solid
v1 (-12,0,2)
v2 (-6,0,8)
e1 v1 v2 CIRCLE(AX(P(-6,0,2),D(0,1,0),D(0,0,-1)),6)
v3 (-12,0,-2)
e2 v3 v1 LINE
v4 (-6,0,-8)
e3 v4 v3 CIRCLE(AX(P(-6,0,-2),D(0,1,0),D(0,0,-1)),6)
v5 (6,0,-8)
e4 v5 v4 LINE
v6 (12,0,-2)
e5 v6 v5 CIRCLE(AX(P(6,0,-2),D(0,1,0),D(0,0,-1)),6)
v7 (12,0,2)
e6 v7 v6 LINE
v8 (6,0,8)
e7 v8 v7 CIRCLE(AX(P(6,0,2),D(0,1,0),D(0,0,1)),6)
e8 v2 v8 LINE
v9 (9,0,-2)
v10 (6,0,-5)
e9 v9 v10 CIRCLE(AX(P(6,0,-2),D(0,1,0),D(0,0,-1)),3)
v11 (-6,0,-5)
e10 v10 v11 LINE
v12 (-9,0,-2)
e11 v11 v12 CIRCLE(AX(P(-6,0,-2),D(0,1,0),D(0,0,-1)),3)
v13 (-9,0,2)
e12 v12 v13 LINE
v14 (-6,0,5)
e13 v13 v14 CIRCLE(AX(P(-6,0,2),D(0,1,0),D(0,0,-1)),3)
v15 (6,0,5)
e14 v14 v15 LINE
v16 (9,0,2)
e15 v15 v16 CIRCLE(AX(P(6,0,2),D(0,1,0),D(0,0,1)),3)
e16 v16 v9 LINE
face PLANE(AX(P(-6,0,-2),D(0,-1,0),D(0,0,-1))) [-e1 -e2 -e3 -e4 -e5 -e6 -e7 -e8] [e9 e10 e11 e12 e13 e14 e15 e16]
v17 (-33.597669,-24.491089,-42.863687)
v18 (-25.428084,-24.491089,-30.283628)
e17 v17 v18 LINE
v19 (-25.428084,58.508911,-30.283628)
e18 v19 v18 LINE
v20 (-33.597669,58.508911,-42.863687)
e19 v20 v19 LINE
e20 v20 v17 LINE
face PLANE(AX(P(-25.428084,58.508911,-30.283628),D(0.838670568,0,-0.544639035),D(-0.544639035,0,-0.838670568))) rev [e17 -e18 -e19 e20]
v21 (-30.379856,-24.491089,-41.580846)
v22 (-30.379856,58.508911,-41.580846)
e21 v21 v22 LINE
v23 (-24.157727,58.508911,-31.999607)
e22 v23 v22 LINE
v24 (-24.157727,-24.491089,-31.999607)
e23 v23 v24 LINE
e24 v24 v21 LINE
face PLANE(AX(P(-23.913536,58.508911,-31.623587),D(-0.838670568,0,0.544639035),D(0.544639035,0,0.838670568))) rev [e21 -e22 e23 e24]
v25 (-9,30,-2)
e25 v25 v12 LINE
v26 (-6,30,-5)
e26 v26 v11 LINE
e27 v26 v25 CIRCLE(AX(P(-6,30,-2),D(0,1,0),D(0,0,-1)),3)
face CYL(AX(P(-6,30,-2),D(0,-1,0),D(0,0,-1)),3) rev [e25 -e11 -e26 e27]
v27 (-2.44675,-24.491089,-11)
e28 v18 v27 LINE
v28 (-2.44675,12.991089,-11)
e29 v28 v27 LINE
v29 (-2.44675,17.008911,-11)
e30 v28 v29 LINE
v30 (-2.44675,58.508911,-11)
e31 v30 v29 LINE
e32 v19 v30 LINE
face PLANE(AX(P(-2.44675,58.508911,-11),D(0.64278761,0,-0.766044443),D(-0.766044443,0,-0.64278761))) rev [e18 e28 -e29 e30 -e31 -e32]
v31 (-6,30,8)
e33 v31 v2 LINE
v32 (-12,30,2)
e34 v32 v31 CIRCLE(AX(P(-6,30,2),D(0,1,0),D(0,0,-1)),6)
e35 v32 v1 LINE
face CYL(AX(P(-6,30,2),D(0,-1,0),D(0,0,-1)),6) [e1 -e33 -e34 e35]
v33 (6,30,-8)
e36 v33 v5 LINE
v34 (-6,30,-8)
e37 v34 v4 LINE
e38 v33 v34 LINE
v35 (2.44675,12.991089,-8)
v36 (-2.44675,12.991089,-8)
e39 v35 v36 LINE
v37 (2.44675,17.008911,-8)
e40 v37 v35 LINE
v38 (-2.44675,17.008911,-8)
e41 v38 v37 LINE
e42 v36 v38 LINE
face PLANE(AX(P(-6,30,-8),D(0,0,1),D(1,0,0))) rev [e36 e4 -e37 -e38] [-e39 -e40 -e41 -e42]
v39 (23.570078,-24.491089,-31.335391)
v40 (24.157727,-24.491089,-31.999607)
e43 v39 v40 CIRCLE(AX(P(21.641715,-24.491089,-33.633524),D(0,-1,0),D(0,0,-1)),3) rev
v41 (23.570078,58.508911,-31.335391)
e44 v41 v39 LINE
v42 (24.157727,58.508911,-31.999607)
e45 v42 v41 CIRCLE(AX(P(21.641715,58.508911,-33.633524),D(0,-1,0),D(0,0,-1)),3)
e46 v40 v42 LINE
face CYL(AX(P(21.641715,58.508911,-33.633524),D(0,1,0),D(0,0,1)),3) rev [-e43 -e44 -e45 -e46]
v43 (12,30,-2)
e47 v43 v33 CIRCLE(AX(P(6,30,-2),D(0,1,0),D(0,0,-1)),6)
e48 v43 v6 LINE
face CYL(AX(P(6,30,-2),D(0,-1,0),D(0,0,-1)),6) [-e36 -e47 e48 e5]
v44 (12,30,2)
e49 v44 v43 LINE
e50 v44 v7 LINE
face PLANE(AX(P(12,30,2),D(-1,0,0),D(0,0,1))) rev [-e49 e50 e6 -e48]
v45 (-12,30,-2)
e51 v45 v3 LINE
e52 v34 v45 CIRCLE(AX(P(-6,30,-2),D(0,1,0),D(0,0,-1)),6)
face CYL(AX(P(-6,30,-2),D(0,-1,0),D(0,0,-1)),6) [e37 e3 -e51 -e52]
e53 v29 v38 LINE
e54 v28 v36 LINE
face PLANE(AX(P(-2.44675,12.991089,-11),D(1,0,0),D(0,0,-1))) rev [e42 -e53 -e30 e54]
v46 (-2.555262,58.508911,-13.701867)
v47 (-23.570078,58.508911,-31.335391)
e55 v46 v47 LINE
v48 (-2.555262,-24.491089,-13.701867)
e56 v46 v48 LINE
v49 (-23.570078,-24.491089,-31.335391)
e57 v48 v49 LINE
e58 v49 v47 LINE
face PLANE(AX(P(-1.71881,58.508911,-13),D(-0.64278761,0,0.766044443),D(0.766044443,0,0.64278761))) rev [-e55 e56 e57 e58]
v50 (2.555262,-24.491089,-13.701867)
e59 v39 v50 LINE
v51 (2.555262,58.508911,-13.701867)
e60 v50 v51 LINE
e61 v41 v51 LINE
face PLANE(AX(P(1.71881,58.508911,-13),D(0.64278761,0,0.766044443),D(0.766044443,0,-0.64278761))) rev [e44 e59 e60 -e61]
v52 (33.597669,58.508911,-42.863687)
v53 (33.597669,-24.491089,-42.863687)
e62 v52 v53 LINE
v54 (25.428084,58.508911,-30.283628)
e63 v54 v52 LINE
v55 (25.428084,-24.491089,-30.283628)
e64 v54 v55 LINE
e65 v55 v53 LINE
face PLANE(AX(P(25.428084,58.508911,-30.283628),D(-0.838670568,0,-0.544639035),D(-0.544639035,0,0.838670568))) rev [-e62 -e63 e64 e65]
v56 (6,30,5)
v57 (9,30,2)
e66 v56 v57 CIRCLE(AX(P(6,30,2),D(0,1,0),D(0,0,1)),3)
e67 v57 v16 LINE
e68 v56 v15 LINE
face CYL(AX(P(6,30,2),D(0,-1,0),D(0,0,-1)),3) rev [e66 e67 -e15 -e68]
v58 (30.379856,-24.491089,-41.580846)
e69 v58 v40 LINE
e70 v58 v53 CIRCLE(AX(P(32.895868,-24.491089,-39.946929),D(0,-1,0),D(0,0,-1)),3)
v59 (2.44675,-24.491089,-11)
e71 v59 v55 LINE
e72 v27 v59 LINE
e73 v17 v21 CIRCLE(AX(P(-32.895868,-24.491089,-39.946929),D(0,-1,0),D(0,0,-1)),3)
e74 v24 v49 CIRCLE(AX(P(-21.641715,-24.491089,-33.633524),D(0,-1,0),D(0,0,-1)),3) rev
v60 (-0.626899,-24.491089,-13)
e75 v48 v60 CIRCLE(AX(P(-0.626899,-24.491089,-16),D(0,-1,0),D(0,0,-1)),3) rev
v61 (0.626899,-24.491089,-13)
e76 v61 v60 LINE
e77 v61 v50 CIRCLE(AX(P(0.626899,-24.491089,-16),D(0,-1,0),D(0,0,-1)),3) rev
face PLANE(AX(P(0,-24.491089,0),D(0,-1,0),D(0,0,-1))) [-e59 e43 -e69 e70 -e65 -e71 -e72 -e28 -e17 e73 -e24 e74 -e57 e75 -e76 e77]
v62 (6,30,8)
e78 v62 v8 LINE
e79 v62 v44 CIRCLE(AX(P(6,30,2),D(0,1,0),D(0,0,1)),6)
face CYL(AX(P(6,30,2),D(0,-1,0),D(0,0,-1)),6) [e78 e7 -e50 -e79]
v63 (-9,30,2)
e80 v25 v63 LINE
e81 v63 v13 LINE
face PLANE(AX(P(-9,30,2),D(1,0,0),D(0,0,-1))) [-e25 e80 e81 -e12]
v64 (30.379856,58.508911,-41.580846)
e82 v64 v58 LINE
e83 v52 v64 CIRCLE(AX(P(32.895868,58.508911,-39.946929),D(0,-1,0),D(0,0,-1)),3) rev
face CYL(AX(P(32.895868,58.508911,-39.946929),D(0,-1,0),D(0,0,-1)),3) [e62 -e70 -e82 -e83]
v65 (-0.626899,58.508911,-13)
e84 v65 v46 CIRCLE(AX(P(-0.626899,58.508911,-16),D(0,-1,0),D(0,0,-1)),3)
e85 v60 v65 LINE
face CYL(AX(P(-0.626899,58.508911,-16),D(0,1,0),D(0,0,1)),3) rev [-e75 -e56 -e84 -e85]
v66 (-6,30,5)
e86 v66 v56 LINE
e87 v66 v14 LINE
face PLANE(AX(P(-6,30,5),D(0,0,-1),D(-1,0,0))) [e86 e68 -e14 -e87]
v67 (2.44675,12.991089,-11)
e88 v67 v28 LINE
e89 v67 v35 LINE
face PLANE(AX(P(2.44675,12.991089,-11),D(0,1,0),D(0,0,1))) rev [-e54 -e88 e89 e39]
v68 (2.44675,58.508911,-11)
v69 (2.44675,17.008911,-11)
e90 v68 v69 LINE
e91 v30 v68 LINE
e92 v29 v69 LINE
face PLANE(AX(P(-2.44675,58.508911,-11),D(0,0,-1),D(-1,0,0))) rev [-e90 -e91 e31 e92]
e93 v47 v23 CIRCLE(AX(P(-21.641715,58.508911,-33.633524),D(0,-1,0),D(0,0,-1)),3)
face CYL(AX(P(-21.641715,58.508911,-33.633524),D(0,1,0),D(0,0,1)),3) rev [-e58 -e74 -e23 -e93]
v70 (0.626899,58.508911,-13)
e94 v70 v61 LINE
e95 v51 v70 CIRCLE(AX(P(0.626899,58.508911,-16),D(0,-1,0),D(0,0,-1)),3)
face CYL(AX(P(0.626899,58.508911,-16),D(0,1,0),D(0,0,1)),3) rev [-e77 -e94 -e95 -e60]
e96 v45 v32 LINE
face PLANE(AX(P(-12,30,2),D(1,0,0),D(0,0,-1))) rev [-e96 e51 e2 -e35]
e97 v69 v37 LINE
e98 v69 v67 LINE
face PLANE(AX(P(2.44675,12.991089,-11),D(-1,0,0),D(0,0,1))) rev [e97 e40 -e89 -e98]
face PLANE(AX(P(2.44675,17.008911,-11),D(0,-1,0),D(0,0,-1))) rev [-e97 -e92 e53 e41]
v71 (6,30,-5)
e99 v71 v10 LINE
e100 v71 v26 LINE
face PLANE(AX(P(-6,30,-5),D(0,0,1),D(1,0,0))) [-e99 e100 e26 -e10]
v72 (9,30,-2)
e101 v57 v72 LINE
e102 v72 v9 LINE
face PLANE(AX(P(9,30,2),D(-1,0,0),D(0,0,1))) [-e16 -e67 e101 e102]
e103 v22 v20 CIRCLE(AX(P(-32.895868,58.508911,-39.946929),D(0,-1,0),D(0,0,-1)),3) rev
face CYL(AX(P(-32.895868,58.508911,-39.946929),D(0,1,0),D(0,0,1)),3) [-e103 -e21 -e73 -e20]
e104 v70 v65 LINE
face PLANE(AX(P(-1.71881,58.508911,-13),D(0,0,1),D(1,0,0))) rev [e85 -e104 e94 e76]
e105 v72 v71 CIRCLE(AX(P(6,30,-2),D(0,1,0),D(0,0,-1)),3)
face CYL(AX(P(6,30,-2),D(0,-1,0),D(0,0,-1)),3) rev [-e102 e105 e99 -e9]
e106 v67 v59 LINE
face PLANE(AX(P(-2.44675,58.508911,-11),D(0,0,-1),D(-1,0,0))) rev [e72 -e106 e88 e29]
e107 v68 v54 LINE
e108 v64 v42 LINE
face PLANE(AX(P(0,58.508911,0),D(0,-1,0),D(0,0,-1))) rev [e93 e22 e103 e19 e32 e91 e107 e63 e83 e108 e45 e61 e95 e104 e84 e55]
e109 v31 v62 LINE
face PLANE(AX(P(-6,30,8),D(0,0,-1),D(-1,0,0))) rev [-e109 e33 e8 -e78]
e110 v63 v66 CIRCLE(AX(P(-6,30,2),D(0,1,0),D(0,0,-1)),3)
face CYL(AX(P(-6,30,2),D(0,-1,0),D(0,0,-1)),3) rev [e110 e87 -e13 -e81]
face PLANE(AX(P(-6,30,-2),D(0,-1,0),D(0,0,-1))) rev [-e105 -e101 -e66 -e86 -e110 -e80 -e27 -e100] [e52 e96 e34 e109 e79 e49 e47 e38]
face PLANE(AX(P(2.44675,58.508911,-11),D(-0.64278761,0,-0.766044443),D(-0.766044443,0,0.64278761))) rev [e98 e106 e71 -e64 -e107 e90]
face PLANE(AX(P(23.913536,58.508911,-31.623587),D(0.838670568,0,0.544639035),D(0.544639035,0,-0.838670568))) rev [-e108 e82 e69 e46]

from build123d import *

# Parameters (mm, degrees)
SALIENTE_EXTRUIR1_DEPTH = 30
CROQUIS3_W              = 4.89350096
CROQUIS3_H              = 4.01782184
SALIENTE_EXTRUIR2_DEPTH = 3
SALIENTE_EXTRUIR3_DEPTH = 41.5
REDONDEO2_R             = 3


with BuildPart() as part:
    # Croquis1 → Saliente-Extruir1 (new body)
    with BuildSketch(Plane(origin=(0, 0, 0), x_dir=(1, 0, 0), z_dir=(0, 1, 0))):
        with BuildLine():
            Line((-6, 8), (6, 8))
            ThreePointArc((6, 8), (10.242640687, 6.242640687), (12, 2))
            Line((12, 2), (12, -2))
            ThreePointArc((12, -2), (10.242640687, -6.242640687), (6, -8))
            Line((6, -8), (-6, -8))
            ThreePointArc((-6, -8), (-10.242640687, -6.242640687), (-12, -2))
            Line((-12, -2), (-12, 2))
            ThreePointArc((-12, 2), (-10.242640687, 6.242640687), (-6, 8))
        make_face()
        with BuildLine():
            Line((-6, -5), (6, -5))
            ThreePointArc((6, -5), (8.121320344, -4.121320344), (9, -2))
            Line((9, -2), (9, 2))
            ThreePointArc((9, 2), (8.121320344, 4.121320344), (6, 5))
            Line((6, 5), (-6, 5))
            ThreePointArc((-6, 5), (-8.121320344, 4.121320344), (-9, 2))
            Line((-9, 2), (-9, -2))
            ThreePointArc((-9, -2), (-8.121320344, -4.121320344), (-6, -5))
        make_face(mode=Mode.SUBTRACT)
    extrude(amount=SALIENTE_EXTRUIR1_DEPTH)

    # Croquis3 → Saliente-Extruir2 (add)
    with BuildSketch(Plane(origin=(0, 0, -8), x_dir=(-1, 0, 0), z_dir=(0, 0, -1))):
        with Locations((0, 15)):
            Rectangle(CROQUIS3_W, CROQUIS3_H)
    extrude(amount=SALIENTE_EXTRUIR2_DEPTH)

    # Croquis7 → Saliente-Extruir3 (add, symmetric)
    with BuildSketch(Plane(origin=(0, 17.00891092, 0), x_dir=(1, 0, 0), z_dir=(0, 1, 0))):
        Polygon((-2.44675048, 11), (2.44675048, 11), (25.428083774, 30.283628291), (33.597669299, 42.86368681), (31.920328163, 43.95296488), (23.913536336, 31.623586673), (1.718810011, 13), (-1.718810011, 13), (-23.913536336, 31.623586673), (-31.920328163, 43.95296488), (-33.597669299, 42.86368681), (-25.428083774, 30.283628291), align=None)
    extrude(amount=SALIENTE_EXTRUIR3_DEPTH, both=True)

    # Redondeo2
    # the kernel refuses this fillet: 3 mm, written as the material it adds along each edge
    with BuildSketch(Plane(origin=(-23.913536336, -24.49108908, -31.623586673), x_dir=(0.7660444431189832, 0, 0.6427876096865331), z_dir=(0, 1, 0)), Plane(origin=(23.913536336, -24.49108908, -31.623586673), x_dir=(0.5446390350150309, 0, -0.8386705679454215), z_dir=(0, 1, 0))) as redondeo2_piece_1:
        with BuildLine():
            CenterArc((REDONDEO2_R * 0.149451001349, REDONDEO2_R), REDONDEO2_R, 253, 17)
            Line((-REDONDEO2_R * 0.142920703374, REDONDEO2_R * 0.043695244037), (0, 0))
            Line((0, 0), (REDONDEO2_R * 0.149451001349, 0))
        make_face()
    extrude(amount=83)
    with BuildSketch(Plane(origin=(1.718810011, -24.49108908, -13), x_dir=(0.7660444431189833, 0, -0.6427876096865328), z_dir=(0, 1, 0)), Plane(origin=(-1.718810011, -24.49108908, -13), x_dir=(1, 0, 0), z_dir=(0, 1, 0))) as redondeo2_piece_2:
        with BuildLine():
            CenterArc((REDONDEO2_R * 0.363970234266, REDONDEO2_R), REDONDEO2_R, 230, 40)
            Line((-REDONDEO2_R * 0.27881737542, REDONDEO2_R * 0.233955556881), (0, 0))
            Line((0, 0), (REDONDEO2_R * 0.363970234266, 0))
        make_face()
    extrude(amount=83)
    # the kernel refuses this fillet: 3 mm, written as the material it takes off along each edge
    with BuildSketch(Plane(origin=(31.920328163, -31.562156891, -43.95296488), x_dir=(0.8386705679454225, 0, 0.5446390350150296), z_dir=(0, 1, 0))) as redondeo2_2_piece_1:
        with BuildLine():
            CenterArc((3, -2.828427125), REDONDEO2_R, 109.471220634, 70.528779366)
            Line((0, -2.828427125), (0, 0))
            Line((0, 0), (2, 0))
        make_face()
    extrude(amount=97.142135624, mode=Mode.SUBTRACT)
    with BuildSketch(Plane(origin=(-31.920328163, -31.562156891, -43.95296488), x_dir=(0.5446390350150306, 0, 0.8386705679454217), z_dir=(0, 1, 0))) as redondeo2_2_piece_2:
        with BuildLine():
            CenterArc((2.828427125, -3), REDONDEO2_R, 90, 70.528779366)
            Line((0, -2), (0, 0))
            Line((0, 0), (2.828427125, 0))
        make_face()
    extrude(amount=97.142135624, mode=Mode.SUBTRACT)


solid = part.part
